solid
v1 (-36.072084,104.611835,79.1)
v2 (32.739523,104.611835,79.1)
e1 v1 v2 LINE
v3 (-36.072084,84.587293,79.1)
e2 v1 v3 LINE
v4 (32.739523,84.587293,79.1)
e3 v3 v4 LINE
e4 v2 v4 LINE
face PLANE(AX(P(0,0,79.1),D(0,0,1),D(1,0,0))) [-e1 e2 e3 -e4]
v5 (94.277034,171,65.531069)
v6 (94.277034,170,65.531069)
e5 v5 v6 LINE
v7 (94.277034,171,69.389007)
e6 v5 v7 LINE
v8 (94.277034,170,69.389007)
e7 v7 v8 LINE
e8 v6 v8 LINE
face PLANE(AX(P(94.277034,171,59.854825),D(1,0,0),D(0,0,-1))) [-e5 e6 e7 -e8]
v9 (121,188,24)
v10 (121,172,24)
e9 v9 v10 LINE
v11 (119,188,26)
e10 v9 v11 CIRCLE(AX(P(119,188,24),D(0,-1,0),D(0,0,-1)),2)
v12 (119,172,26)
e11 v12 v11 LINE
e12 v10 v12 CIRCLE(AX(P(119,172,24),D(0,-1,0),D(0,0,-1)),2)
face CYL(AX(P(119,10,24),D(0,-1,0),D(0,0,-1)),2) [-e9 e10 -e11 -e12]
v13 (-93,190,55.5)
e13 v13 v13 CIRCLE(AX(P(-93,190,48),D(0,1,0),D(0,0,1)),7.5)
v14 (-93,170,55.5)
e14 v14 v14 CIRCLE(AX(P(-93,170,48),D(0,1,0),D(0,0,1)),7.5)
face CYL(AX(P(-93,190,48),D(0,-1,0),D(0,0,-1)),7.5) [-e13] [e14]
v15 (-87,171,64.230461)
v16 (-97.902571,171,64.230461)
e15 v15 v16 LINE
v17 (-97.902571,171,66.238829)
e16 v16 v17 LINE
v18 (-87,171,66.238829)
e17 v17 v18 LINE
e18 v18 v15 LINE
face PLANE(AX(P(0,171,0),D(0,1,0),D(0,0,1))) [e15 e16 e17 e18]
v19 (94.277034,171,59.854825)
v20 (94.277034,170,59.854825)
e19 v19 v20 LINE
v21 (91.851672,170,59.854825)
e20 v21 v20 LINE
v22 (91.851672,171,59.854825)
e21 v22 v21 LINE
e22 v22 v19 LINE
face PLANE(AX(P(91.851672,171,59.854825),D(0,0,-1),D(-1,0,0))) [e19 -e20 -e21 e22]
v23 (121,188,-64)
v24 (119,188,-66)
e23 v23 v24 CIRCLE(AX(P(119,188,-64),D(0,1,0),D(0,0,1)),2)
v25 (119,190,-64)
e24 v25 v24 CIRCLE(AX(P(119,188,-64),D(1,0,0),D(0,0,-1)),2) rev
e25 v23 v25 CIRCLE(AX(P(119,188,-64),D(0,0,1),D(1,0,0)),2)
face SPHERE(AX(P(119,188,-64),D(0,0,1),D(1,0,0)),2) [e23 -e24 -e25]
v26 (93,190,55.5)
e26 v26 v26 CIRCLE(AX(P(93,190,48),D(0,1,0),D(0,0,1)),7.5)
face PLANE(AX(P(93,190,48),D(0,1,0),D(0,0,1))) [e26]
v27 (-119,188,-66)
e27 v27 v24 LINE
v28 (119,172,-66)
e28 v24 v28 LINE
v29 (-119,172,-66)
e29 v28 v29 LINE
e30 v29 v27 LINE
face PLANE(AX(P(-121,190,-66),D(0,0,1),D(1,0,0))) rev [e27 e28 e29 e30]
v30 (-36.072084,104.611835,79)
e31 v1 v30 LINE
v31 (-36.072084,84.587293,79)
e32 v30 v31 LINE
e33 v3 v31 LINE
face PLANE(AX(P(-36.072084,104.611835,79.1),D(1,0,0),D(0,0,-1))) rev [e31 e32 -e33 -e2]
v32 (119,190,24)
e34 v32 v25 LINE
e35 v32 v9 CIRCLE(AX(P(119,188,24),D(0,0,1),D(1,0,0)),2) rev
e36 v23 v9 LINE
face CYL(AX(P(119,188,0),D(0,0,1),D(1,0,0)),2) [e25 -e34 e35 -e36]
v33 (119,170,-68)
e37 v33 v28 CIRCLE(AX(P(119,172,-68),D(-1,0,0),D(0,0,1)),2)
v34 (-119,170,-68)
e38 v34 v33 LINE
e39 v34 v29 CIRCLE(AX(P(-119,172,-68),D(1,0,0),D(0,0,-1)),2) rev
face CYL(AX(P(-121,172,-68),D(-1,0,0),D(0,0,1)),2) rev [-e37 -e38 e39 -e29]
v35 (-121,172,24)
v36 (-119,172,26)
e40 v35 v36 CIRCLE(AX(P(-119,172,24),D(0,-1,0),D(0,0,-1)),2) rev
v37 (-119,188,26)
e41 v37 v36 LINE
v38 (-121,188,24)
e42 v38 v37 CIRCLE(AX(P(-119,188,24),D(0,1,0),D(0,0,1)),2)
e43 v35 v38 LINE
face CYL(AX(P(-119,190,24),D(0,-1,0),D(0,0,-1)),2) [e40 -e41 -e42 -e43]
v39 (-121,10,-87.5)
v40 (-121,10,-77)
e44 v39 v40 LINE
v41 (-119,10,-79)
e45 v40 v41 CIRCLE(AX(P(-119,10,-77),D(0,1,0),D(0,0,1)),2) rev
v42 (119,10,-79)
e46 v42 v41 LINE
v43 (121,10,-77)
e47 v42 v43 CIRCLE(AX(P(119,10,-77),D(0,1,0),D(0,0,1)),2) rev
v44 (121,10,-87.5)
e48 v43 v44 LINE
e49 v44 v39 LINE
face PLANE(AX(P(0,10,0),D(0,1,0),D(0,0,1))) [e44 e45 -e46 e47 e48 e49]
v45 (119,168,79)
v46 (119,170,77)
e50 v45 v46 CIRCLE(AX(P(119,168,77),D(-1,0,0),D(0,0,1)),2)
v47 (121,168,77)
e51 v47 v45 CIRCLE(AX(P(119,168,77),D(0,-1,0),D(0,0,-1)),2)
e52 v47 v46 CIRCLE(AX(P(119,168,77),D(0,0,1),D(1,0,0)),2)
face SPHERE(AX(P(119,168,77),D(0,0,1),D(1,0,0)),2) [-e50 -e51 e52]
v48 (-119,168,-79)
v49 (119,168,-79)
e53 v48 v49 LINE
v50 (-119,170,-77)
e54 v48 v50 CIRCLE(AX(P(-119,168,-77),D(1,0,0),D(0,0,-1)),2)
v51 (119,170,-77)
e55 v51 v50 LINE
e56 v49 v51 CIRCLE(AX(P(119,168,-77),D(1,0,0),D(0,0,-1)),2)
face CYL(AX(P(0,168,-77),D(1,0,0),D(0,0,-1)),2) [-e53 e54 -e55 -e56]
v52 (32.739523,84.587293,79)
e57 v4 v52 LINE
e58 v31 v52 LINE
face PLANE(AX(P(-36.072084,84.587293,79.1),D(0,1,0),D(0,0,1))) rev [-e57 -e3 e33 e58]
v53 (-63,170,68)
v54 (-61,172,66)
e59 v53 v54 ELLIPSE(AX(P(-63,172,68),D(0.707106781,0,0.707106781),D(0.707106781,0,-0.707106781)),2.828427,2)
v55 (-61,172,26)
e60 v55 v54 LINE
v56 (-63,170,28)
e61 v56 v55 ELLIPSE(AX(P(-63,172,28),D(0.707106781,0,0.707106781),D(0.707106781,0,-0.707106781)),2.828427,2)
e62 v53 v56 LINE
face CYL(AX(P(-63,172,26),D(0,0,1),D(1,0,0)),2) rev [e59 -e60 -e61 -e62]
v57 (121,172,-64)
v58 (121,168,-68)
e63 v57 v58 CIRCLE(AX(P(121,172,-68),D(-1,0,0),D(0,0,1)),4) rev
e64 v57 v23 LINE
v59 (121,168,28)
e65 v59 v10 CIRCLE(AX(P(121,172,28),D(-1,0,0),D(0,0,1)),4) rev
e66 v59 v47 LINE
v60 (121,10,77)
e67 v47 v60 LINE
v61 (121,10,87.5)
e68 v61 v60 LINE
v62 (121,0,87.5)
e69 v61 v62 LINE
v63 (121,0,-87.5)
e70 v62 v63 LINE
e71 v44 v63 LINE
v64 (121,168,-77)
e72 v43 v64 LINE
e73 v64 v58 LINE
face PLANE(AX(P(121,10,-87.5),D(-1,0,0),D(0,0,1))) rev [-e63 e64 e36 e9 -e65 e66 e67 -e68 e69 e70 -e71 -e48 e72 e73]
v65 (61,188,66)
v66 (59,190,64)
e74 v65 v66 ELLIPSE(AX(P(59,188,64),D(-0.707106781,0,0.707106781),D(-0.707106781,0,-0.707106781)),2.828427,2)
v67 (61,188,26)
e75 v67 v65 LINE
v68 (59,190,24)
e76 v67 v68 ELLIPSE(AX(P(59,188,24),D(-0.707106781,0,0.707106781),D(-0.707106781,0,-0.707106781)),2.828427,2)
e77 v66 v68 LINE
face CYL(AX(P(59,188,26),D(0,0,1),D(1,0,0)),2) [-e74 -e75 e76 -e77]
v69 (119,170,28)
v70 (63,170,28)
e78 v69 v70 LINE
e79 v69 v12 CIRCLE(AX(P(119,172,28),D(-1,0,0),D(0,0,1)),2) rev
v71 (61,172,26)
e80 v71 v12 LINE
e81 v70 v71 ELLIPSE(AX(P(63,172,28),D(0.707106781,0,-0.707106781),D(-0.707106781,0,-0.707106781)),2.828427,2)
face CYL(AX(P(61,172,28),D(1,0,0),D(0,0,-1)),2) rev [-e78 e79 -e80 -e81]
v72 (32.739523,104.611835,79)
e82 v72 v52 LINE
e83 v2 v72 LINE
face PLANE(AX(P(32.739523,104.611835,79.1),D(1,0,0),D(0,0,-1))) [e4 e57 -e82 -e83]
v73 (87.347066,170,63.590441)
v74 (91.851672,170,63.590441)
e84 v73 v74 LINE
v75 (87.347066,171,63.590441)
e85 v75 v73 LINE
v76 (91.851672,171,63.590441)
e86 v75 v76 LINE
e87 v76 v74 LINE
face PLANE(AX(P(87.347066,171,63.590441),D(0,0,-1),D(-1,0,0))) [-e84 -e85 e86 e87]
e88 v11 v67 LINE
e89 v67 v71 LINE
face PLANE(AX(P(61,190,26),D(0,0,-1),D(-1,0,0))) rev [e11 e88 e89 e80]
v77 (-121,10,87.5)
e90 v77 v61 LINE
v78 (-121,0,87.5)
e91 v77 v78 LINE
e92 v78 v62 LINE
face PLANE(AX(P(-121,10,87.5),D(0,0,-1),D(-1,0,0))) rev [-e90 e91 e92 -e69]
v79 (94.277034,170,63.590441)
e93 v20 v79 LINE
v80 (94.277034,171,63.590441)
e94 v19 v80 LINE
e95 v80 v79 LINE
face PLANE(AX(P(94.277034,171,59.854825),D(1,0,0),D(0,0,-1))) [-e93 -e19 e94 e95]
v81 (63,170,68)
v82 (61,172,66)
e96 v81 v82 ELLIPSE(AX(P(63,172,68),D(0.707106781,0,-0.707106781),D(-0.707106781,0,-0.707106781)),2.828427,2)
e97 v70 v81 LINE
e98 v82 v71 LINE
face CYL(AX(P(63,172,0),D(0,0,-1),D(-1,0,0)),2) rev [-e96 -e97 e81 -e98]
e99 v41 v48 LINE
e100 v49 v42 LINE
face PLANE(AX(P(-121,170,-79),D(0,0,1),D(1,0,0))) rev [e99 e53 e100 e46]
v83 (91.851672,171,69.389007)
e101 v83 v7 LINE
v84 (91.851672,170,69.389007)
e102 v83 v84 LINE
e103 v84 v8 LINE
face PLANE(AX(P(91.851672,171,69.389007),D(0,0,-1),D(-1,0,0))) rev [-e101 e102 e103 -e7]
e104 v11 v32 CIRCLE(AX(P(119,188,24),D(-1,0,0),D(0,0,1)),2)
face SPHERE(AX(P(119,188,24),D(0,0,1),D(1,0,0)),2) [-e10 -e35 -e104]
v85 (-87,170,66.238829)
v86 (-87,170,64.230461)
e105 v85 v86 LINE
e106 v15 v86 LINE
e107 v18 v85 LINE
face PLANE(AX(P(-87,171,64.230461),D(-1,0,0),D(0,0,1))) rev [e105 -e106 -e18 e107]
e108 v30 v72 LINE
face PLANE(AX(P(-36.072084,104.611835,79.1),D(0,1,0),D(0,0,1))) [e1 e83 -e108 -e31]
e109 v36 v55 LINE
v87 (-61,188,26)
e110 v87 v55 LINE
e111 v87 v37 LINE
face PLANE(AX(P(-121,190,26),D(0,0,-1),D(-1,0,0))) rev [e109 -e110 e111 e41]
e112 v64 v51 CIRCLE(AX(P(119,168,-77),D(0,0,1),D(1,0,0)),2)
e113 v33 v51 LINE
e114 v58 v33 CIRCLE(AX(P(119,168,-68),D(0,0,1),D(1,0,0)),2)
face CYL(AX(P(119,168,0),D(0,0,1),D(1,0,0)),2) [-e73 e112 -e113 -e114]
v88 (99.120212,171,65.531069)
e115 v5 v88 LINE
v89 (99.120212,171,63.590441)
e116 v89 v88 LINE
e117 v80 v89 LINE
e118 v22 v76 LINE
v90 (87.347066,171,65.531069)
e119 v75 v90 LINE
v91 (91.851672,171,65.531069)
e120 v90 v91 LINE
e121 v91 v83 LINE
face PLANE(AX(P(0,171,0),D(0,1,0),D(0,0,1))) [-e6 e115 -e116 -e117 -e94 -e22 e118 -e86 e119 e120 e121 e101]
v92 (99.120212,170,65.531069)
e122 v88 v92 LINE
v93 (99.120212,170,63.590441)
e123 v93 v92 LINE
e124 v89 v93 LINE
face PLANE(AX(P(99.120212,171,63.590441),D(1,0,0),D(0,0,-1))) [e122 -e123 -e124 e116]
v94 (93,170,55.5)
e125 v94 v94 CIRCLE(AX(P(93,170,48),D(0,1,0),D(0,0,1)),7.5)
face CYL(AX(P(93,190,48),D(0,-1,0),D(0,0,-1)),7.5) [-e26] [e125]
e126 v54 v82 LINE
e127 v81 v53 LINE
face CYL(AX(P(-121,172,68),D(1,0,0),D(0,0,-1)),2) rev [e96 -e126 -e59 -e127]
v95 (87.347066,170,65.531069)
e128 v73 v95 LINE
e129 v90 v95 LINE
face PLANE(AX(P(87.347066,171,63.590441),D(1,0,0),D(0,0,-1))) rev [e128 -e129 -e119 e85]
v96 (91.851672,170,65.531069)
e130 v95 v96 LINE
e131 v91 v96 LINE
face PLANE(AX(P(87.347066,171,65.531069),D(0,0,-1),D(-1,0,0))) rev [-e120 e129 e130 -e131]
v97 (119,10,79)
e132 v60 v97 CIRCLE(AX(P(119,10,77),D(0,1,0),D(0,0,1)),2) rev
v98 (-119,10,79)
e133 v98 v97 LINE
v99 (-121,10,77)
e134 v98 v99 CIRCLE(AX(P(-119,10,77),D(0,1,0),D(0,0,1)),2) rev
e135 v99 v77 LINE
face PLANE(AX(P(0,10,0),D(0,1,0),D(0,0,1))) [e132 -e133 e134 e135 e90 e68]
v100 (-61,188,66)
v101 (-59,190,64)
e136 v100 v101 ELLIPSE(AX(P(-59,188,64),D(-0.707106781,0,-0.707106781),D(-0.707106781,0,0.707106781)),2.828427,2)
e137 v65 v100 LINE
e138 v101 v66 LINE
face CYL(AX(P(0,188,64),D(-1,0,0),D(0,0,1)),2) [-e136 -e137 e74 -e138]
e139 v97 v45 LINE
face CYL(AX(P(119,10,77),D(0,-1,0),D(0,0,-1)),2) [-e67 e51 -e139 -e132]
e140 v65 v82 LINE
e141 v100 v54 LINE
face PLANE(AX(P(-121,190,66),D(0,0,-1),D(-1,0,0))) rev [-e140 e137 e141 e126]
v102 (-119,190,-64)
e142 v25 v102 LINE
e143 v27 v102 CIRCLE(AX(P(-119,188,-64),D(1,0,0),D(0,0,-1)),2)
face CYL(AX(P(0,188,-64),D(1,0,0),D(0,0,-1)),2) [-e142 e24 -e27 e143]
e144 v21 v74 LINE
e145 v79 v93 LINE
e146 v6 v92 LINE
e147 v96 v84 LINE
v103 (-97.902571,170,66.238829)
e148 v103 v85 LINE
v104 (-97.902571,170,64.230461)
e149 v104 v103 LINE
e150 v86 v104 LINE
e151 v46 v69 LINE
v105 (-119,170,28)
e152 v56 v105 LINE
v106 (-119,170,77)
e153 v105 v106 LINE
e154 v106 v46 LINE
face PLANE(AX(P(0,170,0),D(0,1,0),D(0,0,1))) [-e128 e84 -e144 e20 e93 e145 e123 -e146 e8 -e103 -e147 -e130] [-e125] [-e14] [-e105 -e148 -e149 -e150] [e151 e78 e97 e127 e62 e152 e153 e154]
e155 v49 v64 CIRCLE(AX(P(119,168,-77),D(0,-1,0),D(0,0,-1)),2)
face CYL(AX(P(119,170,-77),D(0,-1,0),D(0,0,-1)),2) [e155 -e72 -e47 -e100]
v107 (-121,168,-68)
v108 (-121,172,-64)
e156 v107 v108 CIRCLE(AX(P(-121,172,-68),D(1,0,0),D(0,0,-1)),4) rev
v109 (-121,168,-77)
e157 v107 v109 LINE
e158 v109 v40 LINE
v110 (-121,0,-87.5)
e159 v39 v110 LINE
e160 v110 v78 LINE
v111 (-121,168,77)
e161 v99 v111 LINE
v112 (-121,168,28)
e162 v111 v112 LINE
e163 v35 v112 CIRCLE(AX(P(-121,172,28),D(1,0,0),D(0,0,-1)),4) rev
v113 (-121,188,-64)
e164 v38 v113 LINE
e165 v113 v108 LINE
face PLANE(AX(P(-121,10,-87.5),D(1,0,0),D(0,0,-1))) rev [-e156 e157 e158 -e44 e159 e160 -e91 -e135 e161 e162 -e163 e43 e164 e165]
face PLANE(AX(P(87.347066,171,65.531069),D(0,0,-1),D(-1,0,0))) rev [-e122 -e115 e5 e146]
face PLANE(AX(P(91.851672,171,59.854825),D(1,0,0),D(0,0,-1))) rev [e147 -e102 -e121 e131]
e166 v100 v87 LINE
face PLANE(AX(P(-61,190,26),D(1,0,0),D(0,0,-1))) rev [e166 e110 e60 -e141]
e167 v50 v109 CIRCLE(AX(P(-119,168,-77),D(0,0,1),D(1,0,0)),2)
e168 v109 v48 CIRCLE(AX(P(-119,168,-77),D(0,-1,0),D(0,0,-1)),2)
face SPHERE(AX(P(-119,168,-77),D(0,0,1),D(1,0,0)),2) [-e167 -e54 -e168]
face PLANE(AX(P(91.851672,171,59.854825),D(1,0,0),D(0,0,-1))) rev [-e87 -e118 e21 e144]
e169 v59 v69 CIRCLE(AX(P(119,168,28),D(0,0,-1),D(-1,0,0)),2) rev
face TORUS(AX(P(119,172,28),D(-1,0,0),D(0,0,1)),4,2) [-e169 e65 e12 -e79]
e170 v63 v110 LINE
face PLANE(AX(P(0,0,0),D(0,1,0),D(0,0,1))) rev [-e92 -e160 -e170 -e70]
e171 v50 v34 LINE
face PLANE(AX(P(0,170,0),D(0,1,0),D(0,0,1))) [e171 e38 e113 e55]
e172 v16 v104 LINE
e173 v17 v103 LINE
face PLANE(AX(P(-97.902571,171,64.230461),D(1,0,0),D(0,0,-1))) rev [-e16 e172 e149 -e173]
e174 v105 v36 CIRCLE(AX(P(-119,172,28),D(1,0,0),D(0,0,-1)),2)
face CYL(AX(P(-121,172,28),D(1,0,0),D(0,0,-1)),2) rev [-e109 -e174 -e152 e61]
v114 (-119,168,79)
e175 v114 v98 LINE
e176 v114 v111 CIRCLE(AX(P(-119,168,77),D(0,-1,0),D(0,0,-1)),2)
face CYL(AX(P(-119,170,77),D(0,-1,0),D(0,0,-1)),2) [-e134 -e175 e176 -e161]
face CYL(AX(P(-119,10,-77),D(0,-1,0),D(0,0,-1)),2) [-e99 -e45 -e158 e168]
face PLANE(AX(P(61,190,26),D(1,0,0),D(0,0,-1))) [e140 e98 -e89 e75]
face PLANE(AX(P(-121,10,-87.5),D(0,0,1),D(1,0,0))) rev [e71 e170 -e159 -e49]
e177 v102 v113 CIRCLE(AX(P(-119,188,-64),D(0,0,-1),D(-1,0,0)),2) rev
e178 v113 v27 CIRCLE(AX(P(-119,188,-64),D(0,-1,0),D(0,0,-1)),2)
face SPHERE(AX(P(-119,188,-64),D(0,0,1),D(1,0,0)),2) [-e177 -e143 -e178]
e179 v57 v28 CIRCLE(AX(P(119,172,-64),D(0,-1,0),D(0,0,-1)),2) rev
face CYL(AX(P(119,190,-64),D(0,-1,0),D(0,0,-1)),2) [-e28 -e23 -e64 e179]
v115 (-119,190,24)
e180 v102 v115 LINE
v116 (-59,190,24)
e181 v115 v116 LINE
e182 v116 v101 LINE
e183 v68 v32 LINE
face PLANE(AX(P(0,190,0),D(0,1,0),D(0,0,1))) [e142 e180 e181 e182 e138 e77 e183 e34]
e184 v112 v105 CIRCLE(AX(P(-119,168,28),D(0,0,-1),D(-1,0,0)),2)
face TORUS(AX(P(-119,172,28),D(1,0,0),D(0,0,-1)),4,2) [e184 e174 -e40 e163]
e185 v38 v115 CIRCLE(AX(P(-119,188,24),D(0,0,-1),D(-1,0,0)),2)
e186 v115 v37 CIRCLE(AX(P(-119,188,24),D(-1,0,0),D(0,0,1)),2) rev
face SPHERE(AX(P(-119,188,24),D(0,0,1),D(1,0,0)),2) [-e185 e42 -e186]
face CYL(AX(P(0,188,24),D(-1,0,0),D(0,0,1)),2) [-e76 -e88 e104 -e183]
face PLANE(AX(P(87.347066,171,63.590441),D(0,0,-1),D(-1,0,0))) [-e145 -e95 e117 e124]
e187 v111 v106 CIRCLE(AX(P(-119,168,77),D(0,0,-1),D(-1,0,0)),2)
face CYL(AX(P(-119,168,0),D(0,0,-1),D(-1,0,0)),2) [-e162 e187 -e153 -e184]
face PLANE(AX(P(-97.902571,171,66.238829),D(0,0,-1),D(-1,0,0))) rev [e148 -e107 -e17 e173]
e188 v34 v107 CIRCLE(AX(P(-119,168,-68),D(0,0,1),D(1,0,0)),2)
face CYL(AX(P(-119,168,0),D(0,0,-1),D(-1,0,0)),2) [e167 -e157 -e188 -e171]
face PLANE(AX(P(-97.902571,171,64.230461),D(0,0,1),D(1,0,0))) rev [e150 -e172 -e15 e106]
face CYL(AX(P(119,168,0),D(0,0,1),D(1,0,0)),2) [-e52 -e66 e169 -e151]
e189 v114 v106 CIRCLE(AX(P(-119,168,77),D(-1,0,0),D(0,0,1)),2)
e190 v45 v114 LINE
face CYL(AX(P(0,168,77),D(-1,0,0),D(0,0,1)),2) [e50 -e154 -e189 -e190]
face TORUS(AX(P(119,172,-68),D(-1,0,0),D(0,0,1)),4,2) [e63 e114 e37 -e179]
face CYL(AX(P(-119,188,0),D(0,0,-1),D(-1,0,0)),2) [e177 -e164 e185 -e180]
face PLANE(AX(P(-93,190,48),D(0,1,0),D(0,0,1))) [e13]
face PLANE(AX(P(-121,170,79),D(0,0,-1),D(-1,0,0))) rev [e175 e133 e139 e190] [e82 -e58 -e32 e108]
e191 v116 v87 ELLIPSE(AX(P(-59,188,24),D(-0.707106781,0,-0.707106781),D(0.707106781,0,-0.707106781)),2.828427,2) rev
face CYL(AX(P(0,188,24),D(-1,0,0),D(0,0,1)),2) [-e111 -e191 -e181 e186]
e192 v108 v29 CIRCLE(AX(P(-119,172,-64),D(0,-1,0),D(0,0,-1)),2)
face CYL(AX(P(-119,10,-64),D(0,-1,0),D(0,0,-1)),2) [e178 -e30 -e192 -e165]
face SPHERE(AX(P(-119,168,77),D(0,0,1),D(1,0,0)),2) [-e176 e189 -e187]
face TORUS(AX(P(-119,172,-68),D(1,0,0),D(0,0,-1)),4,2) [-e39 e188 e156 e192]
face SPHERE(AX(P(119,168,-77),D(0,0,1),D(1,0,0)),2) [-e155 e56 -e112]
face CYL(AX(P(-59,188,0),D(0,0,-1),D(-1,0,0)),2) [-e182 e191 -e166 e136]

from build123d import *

# Parameters (mm, degrees)
SKETCH_1_W          = 242
SKETCH_1_H          = 175
EXTRUDE_1_DEPTH     = 10
SKETCH_2_W          = 242
SKETCH_2_H          = 158
EXTRUDE_2_DEPTH     = 160
SKETCH_3_W          = 242
SKETCH_3_H          = 132
EXTRUDE_3_DEPTH     = 20
SKETCH_4_W          = 60
SKETCH_4_H          = 40
CUT_EXTRUDE_1_DEPTH = 20
SKETCH_5_W          = 60
SKETCH_5_H          = 40
CUT_EXTRUDE_2_DEPTH = 20
FILLET_2_R          = 2
FILLET_3_R          = 2
FILLET_4_R          = 2
FILLET_5_R          = 2
FILLET_6_R          = 2
FILLET_7_R          = 2
FILLET_8_R          = 2
SKETCH_6_R          = 7.5
EXTRUDE_4_DEPTH     = 20
SKETCH_7_R          = 7.5
EXTRUDE_5_DEPTH     = 20
SKETCH_9_W          = 10.902570875
SKETCH_9_H          = 2.008368319
EXTRUDE_6_DEPTH     = 1
SKETCH_10_W         = 11.773146019
SKETCH_10_H         = 1.940628464
EXTRUDE_7_DEPTH     = 1
SKETCH_11_W         = 2.42536198
SKETCH_11_H         = 9.534181576
EXTRUDE_8_DEPTH     = 1
SKETCH_12_W         = 68.811606865
SKETCH_12_H         = 20.02454168
EXTRUDE_9_DEPTH     = 0.1


with BuildPart() as part:
    # 草图1 → 凸台-拉伸1 (new body)
    with BuildSketch(Plane(origin=(0, 0, 0), x_dir=(1, 0, 0), z_dir=(0, 1, 0))):
        Rectangle(SKETCH_1_W, SKETCH_1_H)
    extrude(amount=EXTRUDE_1_DEPTH)

    # 草图2 → 凸台-拉伸2 (add)
    with BuildSketch(Plane(origin=(0, 10, 0), x_dir=(1, 0, 0), z_dir=(0, 1, 0))):
        Rectangle(SKETCH_2_W, SKETCH_2_H)
    extrude(amount=EXTRUDE_2_DEPTH)

    # 草图3 → 凸台-拉伸3 (add)
    with BuildSketch(Plane(origin=(0, 170, 0), x_dir=(1, 0, 0), z_dir=(0, 1, 0))):
        Rectangle(SKETCH_3_W, SKETCH_3_H)
    extrude(amount=EXTRUDE_3_DEPTH)

    # 草图4 → 切除-拉伸1 (cut)
    with BuildSketch(Plane(origin=(0, 170, 0), x_dir=(1, 0, 0), z_dir=(0, 1, 0))):
        with Locations((-91, -46)):
            Rectangle(SKETCH_4_W, SKETCH_4_H)
    extrude(amount=CUT_EXTRUDE_1_DEPTH, mode=Mode.SUBTRACT)

    # 草图5 → 切除-拉伸2 (cut)
    with BuildSketch(Plane(origin=(0, 170, 0), x_dir=(1, 0, 0), z_dir=(0, 1, 0))):
        with Locations((91, -46)):
            Rectangle(SKETCH_5_W, SKETCH_5_H)
    extrude(amount=CUT_EXTRUDE_2_DEPTH, mode=Mode.SUBTRACT)

    # 圆角2
    fillet_2_edges = [part.edges().sort_by_distance(p)[0] for p in [
        (-121, 90, 79),
    ]]
    fillet(fillet_2_edges, radius=FILLET_2_R)

    # 圆角3
    fillet_3_edges = [part.edges().sort_by_distance(p)[0] for p in [
        (121, 90, 79),
    ]]
    fillet(fillet_3_edges, radius=FILLET_3_R)

    # 圆角4
    fillet_4_edges = [part.edges().sort_by_distance(p)[0] for p in [
        (121, 90, -79),
    ]]
    fillet(fillet_4_edges, radius=FILLET_4_R)

    # 圆角5
    fillet_5_edges = [part.edges().sort_by_distance(p)[0] for p in [
        (-121, 90, -79),
    ]]
    fillet(fillet_5_edges, radius=FILLET_5_R)

    # 圆角6
    fillet_6_edges = [part.edges().sort_by_distance(p)[0] for p in [
        (-61, 190, 46),
        (-91, 190, 26),
        (-121, 190, -20),
        (0, 190, -66),
        (121, 190, -20),
        (91, 190, 26),
        (61, 190, 46),
        (0, 190, 66),
    ]]
    fillet(fillet_6_edges, radius=FILLET_6_R)

    # 圆角7
    # the kernel refuses this fillet: 2 mm, written as the material it adds along each edge
    with BuildSketch(Plane(origin=(61, 170, 66), x_dir=(0, 0, 1), z_dir=(-1, 0, 0))) as fillet_7_piece_1:
        with BuildLine():
            CenterArc((FILLET_7_R, FILLET_7_R), FILLET_7_R, 180, 90)
            Line((0, FILLET_7_R), (0, 0))
            Line((0, 0), (FILLET_7_R, 0))
        make_face()
    extrude(amount=122)
    with BuildSketch(Plane(origin=(-121, 170, 26), x_dir=(0, 1, 0), z_dir=(1, 0, 0))) as fillet_7_piece_2:
        with BuildLine():
            CenterArc((FILLET_7_R, FILLET_7_R), FILLET_7_R, 180, 90)
            Line((0, FILLET_7_R), (0, 0))
            Line((0, 0), (FILLET_7_R, 0))
        make_face()
    extrude(amount=65)
    with BuildSketch(Plane(origin=(-61, 170, 21), x_dir=(-1, 0, 0), z_dir=(0, 0, 1)), Plane(origin=(61, 170, 66), x_dir=(1, 0, 0), z_dir=(0, 0, -1))) as fillet_7_piece_3:
        with BuildLine():
            CenterArc((FILLET_7_R, -FILLET_7_R), FILLET_7_R, 90, 90)
            Line((0, -FILLET_7_R), (0, 0))
            Line((0, 0), (FILLET_7_R, 0))
        make_face()
    extrude(amount=45)
    with BuildSketch(Plane(origin=(56, 170, 26), x_dir=(0, 0, 1), z_dir=(1, 0, 0))) as fillet_7_piece_4:
        with BuildLine():
            CenterArc((FILLET_7_R, -FILLET_7_R), FILLET_7_R, 90, 90)
            Line((0, -FILLET_7_R), (0, 0))
            Line((0, 0), (FILLET_7_R, 0))
        make_face()
    extrude(amount=65)
    with BuildSketch(Plane(origin=(61, 170, 71), x_dir=(1, 0, 0), z_dir=(0, 0, -1))) as fillet_7_piece_5a_section:
        with BuildLine():
            CenterArc((FILLET_7_R, -FILLET_7_R), FILLET_7_R, 90, 90)
            Line((0, -FILLET_7_R), (0, 0))
            Line((0, 0), (FILLET_7_R, 0))
        make_face()
    fillet_7_piece_5a = extrude(amount=45, mode=Mode.PRIVATE)
    fillet_7_piece_5a = split(fillet_7_piece_5a, bisect_by=Plane(origin=(61.452790229, 170.452790229, 66), z_dir=(0, 0, 1)), keep=Keep.TOP, mode=Mode.PRIVATE)
    with BuildSketch(Plane(origin=(66, 170, 66), x_dir=(0, 0, 1), z_dir=(-1, 0, 0))) as fillet_7_piece_5b_section:
        with BuildLine():
            CenterArc((FILLET_7_R, FILLET_7_R), FILLET_7_R, 180, 90)
            Line((0, FILLET_7_R), (0, 0))
            Line((0, 0), (FILLET_7_R, 0))
        make_face()
    fillet_7_piece_5b = extrude(amount=127, mode=Mode.PRIVATE)
    fillet_7_piece_5b = split(fillet_7_piece_5b, bisect_by=Plane(origin=(61, 170.452790229, 66.452790229), z_dir=(1, 0, 0)), keep=Keep.TOP, mode=Mode.PRIVATE)
    fillet_7_piece_5 = fillet_7_piece_5a & fillet_7_piece_5b
    add(fillet_7_piece_5)
    with BuildSketch(Plane(origin=(-61, 170, 26), x_dir=(-1, 0, 0), z_dir=(0, 0, 1))) as fillet_7_piece_6a_section:
        with BuildLine():
            CenterArc((FILLET_7_R, -FILLET_7_R), FILLET_7_R, 90, 90)
            Line((0, -FILLET_7_R), (0, 0))
            Line((0, 0), (FILLET_7_R, 0))
        make_face()
    fillet_7_piece_6a = extrude(amount=45, mode=Mode.PRIVATE)
    fillet_7_piece_6a = split(fillet_7_piece_6a, bisect_by=Plane(origin=(-61.452790229, 170.452790229, 66), z_dir=(0, 0, 1)), keep=Keep.TOP, mode=Mode.PRIVATE)
    with BuildSketch(Plane(origin=(61, 170, 66), x_dir=(0, 0, 1), z_dir=(-1, 0, 0))) as fillet_7_piece_6b_section:
        with BuildLine():
            CenterArc((FILLET_7_R, FILLET_7_R), FILLET_7_R, 180, 90)
            Line((0, FILLET_7_R), (0, 0))
            Line((0, 0), (FILLET_7_R, 0))
        make_face()
    fillet_7_piece_6b = extrude(amount=127, mode=Mode.PRIVATE)
    fillet_7_piece_6b = split(fillet_7_piece_6b, bisect_by=Plane(origin=(-61, 170.452790229, 66.452790229), z_dir=(-1, 0, 0)), keep=Keep.TOP, mode=Mode.PRIVATE)
    fillet_7_piece_6 = fillet_7_piece_6a & fillet_7_piece_6b
    add(fillet_7_piece_6)
    # the kernel refuses this fillet: 2 mm, written as the material it takes off along each edge
    with BuildSketch(Plane(origin=(119, 188, 24), x_dir=(0, 0, 1), z_dir=(1, 0, 0))) as fillet_7_2_piece_1_section:
        Polygon((0, 0), (FILLET_7_R, 0), (FILLET_7_R, -FILLET_7_R), (0, -FILLET_7_R), align=None)
    fillet_7_2_piece_1 = extrude(amount=FILLET_7_R, mode=Mode.PRIVATE)
    fillet_7_2_piece_1 = fillet_7_2_piece_1 - Plane(origin=(119, 188, 24), x_dir=(0, -0.7071067811865475, -0.7071067811865475), z_dir=(1, 0, 0)) * Sphere(FILLET_7_R, mode=Mode.PRIVATE)
    add(fillet_7_2_piece_1, mode=Mode.SUBTRACT)
    with BuildSketch(Plane(origin=(-119, 188, 24), x_dir=(-1, 0, 0), z_dir=(0, 0, 1))) as fillet_7_2_piece_2_section:
        Polygon((0, 0), (FILLET_7_R, 0), (FILLET_7_R, -FILLET_7_R), (0, -FILLET_7_R), align=None)
    fillet_7_2_piece_2 = extrude(amount=FILLET_7_R, mode=Mode.PRIVATE)
    fillet_7_2_piece_2 = fillet_7_2_piece_2 - Plane(origin=(-119, 188, 24), x_dir=(0.7071067811865475, -0.7071067811865475, 0), z_dir=(0, 0, 1)) * Sphere(FILLET_7_R, mode=Mode.PRIVATE)
    add(fillet_7_2_piece_2, mode=Mode.SUBTRACT)
    with BuildSketch(Plane(origin=(-121, 172, 26), x_dir=(1, 0, 0), z_dir=(0, 1, 0)), Plane(origin=(121, 172, 26), x_dir=(0, 0, -1), z_dir=(0, 1, 0))) as fillet_7_2_piece_3:
        with BuildLine():
            CenterArc((FILLET_7_R, FILLET_7_R), FILLET_7_R, 180, 90)
            Line((0, FILLET_7_R), (0, 0))
            Line((0, 0), (FILLET_7_R, 0))
        make_face()
    extrude(amount=16, mode=Mode.SUBTRACT)
    with BuildSketch(Plane(origin=(-121, 170, 77), x_dir=(1, 0, 0), z_dir=(0, 0, -1))) as fillet_7_2_piece_4:
        with BuildLine():
            CenterArc((FILLET_7_R, FILLET_7_R), FILLET_7_R, 180, 90)
            Line((0, FILLET_7_R), (0, 0))
            Line((0, 0), (FILLET_7_R, 0))
        make_face()
    extrude(amount=49, mode=Mode.SUBTRACT)
    with BuildSketch(Plane(origin=(119, 170, 79), x_dir=(0, -1, 0), z_dir=(-1, 0, 0))) as fillet_7_2_piece_5:
        with BuildLine():
            CenterArc((FILLET_7_R, -FILLET_7_R), FILLET_7_R, 90, 90)
            Line((0, -FILLET_7_R), (0, 0))
            Line((0, 0), (FILLET_7_R, 0))
        make_face()
    extrude(amount=238, mode=Mode.SUBTRACT)
    with BuildSketch(Plane(origin=(-119, 170, 77), x_dir=(0, 0, 1), z_dir=(1, 0, 0))) as fillet_7_2_piece_6:
        with BuildLine():
            CenterArc((2 - FILLET_7_R, FILLET_7_R), FILLET_7_R, 270, 90)
            Line((2 - FILLET_7_R, 0), (2, 0))
            Line((2, 0), (2, FILLET_7_R))
        make_face()
    revolve(axis=Axis((-119, 170, 77), (0, -1, 0)), revolution_arc=90, mode=Mode.SUBTRACT)
    with BuildSketch(Plane(origin=(121, 170, 28), x_dir=(0, -1, 0), z_dir=(0, 0, 1))) as fillet_7_2_piece_7:
        with BuildLine():
            CenterArc((FILLET_7_R, -FILLET_7_R), FILLET_7_R, 90, 90)
            Line((0, -FILLET_7_R), (0, 0))
            Line((0, 0), (FILLET_7_R, 0))
        make_face()
    extrude(amount=49, mode=Mode.SUBTRACT)
    with BuildSketch(Plane(origin=(119, 170, 77), x_dir=(1, 0, 0), z_dir=(0, 0, -1))) as fillet_7_2_piece_8:
        with BuildLine():
            CenterArc((2 - FILLET_7_R, FILLET_7_R), FILLET_7_R, 270, 90)
            Line((2 - FILLET_7_R, 0), (2, 0))
            Line((2, 0), (2, FILLET_7_R))
        make_face()
    revolve(axis=Axis((119, 170, 77), (0, -1, 0)), revolution_arc=90, mode=Mode.SUBTRACT)
    with BuildSketch(Plane(origin=(121, 172, 28), x_dir=(0, -1, 0), z_dir=(0, 0, 1))) as fillet_7_2_piece_9:
        with BuildLine():
            CenterArc((2 + FILLET_7_R, -FILLET_7_R), FILLET_7_R, 90, 90)
            Line((2, -FILLET_7_R), (2, 0))
            Line((2, 0), (2 + FILLET_7_R, 0))
        make_face()
    revolve(axis=Axis((121, 172, 28), (1, 0, 0)), revolution_arc=90, mode=Mode.SUBTRACT)
    with BuildSketch(Plane(origin=(-121, 172, 28), x_dir=(0, 0, -1), z_dir=(0, 1, 0))) as fillet_7_2_piece_10:
        with BuildLine():
            CenterArc((2 + FILLET_7_R, -FILLET_7_R), FILLET_7_R, 90, 90)
            Line((2 + FILLET_7_R, 0), (2, 0))
            Line((2, 0), (2, -FILLET_7_R))
        make_face()
    revolve(axis=Axis((-121, 172, 28), (-1, 0, 0)), revolution_arc=90, mode=Mode.SUBTRACT)

    # 圆角8
    # the kernel refuses this fillet: 2 mm, written as the material it adds along each edge
    with BuildSketch(Plane(origin=(-121, 170, -66), x_dir=(0, 0, -1), z_dir=(1, 0, 0))) as fillet_8_piece_1:
        with BuildLine():
            CenterArc((FILLET_8_R, FILLET_8_R), FILLET_8_R, 180, 90)
            Line((0, FILLET_8_R), (0, 0))
            Line((0, 0), (FILLET_8_R, 0))
        make_face()
    extrude(amount=242)
    # the kernel refuses this fillet: 2 mm, written as the material it takes off along each edge
    with BuildSketch(Plane(origin=(119, 188, -64), x_dir=(0, 0, -1), z_dir=(1, 0, 0))) as fillet_8_2_piece_1_section:
        Polygon((0, 0), (FILLET_8_R, 0), (FILLET_8_R, FILLET_8_R), (0, FILLET_8_R), align=None)
    fillet_8_2_piece_1 = extrude(amount=FILLET_8_R, mode=Mode.PRIVATE)
    fillet_8_2_piece_1 = fillet_8_2_piece_1 - Plane(origin=(119, 188, -64), x_dir=(0, -0.7071067811865475, 0.7071067811865475), z_dir=(1, 0, 0)) * Sphere(FILLET_8_R, mode=Mode.PRIVATE)
    add(fillet_8_2_piece_1, mode=Mode.SUBTRACT)
    with BuildSketch(Plane(origin=(-119, 188, -64), x_dir=(0, 0, -1), z_dir=(-1, 0, 0))) as fillet_8_2_piece_2_section:
        Polygon((0, 0), (FILLET_8_R, 0), (FILLET_8_R, -FILLET_8_R), (0, -FILLET_8_R), align=None)
    fillet_8_2_piece_2 = extrude(amount=FILLET_8_R, mode=Mode.PRIVATE)
    fillet_8_2_piece_2 = fillet_8_2_piece_2 - Plane(origin=(-119, 188, -64), x_dir=(0, -0.7071067811865475, 0.7071067811865475), z_dir=(-1, 0, 0)) * Sphere(FILLET_8_R, mode=Mode.PRIVATE)
    add(fillet_8_2_piece_2, mode=Mode.SUBTRACT)
    with BuildSketch(Plane(origin=(119, 170, -77), x_dir=(0, 0, -1), z_dir=(-1, 0, 0))) as fillet_8_2_piece_3:
        with BuildLine():
            CenterArc((2 - FILLET_8_R, FILLET_8_R), FILLET_8_R, 270, 90)
            Line((2, FILLET_8_R), (2, 0))
            Line((2, 0), (2 - FILLET_8_R, 0))
        make_face()
    revolve(axis=Axis((119, 170, -77), (0, -1, 0)), revolution_arc=90, mode=Mode.SUBTRACT)
    with BuildSketch(Plane(origin=(-121, 170, -68), x_dir=(0, -1, 0), z_dir=(0, 0, -1)), Plane(origin=(121, 170, -77), x_dir=(0, -1, 0), z_dir=(0, 0, 1))) as fillet_8_2_piece_4:
        with BuildLine():
            CenterArc((FILLET_8_R, -FILLET_8_R), FILLET_8_R, 90, 90)
            Line((0, -FILLET_8_R), (0, 0))
            Line((0, 0), (FILLET_8_R, 0))
        make_face()
    extrude(amount=9, mode=Mode.SUBTRACT)
    with BuildSketch(Plane(origin=(-119, 170, -77), x_dir=(-1, 0, 0), z_dir=(0, 0, 1))) as fillet_8_2_piece_5:
        with BuildLine():
            CenterArc((2 - FILLET_8_R, FILLET_8_R), FILLET_8_R, 270, 90)
            Line((2 - FILLET_8_R, 0), (2, 0))
            Line((2, 0), (2, FILLET_8_R))
        make_face()
    revolve(axis=Axis((-119, 170, -77), (0, -1, 0)), revolution_arc=90, mode=Mode.SUBTRACT)
    with BuildSketch(Plane(origin=(-121, 172, -66), x_dir=(0, 0, 1), z_dir=(0, 1, 0))) as fillet_8_2_piece_6:
        with BuildLine():
            CenterArc((FILLET_8_R, FILLET_8_R), FILLET_8_R, 180, 90)
            Line((0, FILLET_8_R), (0, 0))
            Line((0, 0), (FILLET_8_R, 0))
        make_face()
    extrude(amount=16, mode=Mode.SUBTRACT)
    with BuildSketch(Plane(origin=(121, 172, -66), x_dir=(0, 0, 1), z_dir=(0, 1, 0))) as fillet_8_2_piece_7:
        with BuildLine():
            CenterArc((FILLET_8_R, -FILLET_8_R), FILLET_8_R, 90, 90)
            Line((0, -FILLET_8_R), (0, 0))
            Line((0, 0), (FILLET_8_R, 0))
        make_face()
    extrude(amount=16, mode=Mode.SUBTRACT)
    with BuildSketch(Plane(origin=(-119, 170, -79), x_dir=(0, 0, 1), z_dir=(1, 0, 0))) as fillet_8_2_piece_8:
        with BuildLine():
            CenterArc((FILLET_8_R, FILLET_8_R), FILLET_8_R, 180, 90)
            Line((0, FILLET_8_R), (0, 0))
            Line((0, 0), (FILLET_8_R, 0))
        make_face()
    extrude(amount=238, mode=Mode.SUBTRACT)
    with BuildSketch(Plane(origin=(121, 172, -68), x_dir=(0, -1, 0), z_dir=(0, 0, -1))) as fillet_8_2_piece_9:
        with BuildLine():
            CenterArc((2 + FILLET_8_R, FILLET_8_R), FILLET_8_R, 180, 90)
            Line((2, FILLET_8_R), (2, 0))
            Line((2, 0), (2 + FILLET_8_R, 0))
        make_face()
    revolve(axis=Axis((121, 172, -68), (-1, 0, 0)), revolution_arc=90, mode=Mode.SUBTRACT)
    with BuildSketch(Plane(origin=(-121, 172, -68), x_dir=(0, -1, 0), z_dir=(0, 0, -1))) as fillet_8_2_piece_10:
        with BuildLine():
            CenterArc((2 + FILLET_8_R, -FILLET_8_R), FILLET_8_R, 90, 90)
            Line((2, -FILLET_8_R), (2, 0))
            Line((2, 0), (2 + FILLET_8_R, 0))
        make_face()
    revolve(axis=Axis((-121, 172, -68), (-1, 0, 0)), revolution_arc=90, mode=Mode.SUBTRACT)

    # 草图6 → 凸台-拉伸4 (add)
    with BuildSketch(Plane(origin=(0, 170, 0), x_dir=(1, 0, 0), z_dir=(0, 1, 0))):
        with Locations(Location((-93, -48, 0), (0, 0, 270))):
            Circle(SKETCH_6_R)
    extrude(amount=EXTRUDE_4_DEPTH)

    # 草图7 → 凸台-拉伸5 (add)
    with BuildSketch(Plane(origin=(0, 170, 0), x_dir=(1, 0, 0), z_dir=(0, 1, 0))):
        with Locations(Location((93, -48, 0), (0, 0, 270))):
            Circle(SKETCH_7_R)
    extrude(amount=EXTRUDE_5_DEPTH)

    # 草图9 → 凸台-拉伸6 (add)
    with BuildSketch(Plane(origin=(0, 170, 0), x_dir=(1, 0, 0), z_dir=(0, 1, 0))):
        with Locations((-92.451285438, -65.23464498)):
            Rectangle(SKETCH_9_W, SKETCH_9_H)
    extrude(amount=EXTRUDE_6_DEPTH)

    # 草图10 → 凸台-拉伸7 (add)
    with BuildSketch(Plane(origin=(0, 170, 0), x_dir=(1, 0, 0), z_dir=(0, 1, 0))):
        with Locations((93.2336389, -64.560754974)):
            Rectangle(SKETCH_10_W, SKETCH_10_H)
    extrude(amount=EXTRUDE_7_DEPTH)

    # 草图11 → 凸台-拉伸8 (add)
    with BuildSketch(Plane(origin=(0, 170, 0), x_dir=(1, 0, 0), z_dir=(0, 1, 0))):
        with Locations((93.064353377, -64.621916085)):
            Rectangle(SKETCH_11_W, SKETCH_11_H)
    extrude(amount=EXTRUDE_8_DEPTH)

    # 草图12 → 凸台-拉伸9 (add)
    with BuildSketch(Plane.XY.offset(79)):
        with Locations((-1.666280354, 94.599564074)):
            Rectangle(SKETCH_12_W, SKETCH_12_H)
    extrude(amount=EXTRUDE_9_DEPTH)


solid = part.part
